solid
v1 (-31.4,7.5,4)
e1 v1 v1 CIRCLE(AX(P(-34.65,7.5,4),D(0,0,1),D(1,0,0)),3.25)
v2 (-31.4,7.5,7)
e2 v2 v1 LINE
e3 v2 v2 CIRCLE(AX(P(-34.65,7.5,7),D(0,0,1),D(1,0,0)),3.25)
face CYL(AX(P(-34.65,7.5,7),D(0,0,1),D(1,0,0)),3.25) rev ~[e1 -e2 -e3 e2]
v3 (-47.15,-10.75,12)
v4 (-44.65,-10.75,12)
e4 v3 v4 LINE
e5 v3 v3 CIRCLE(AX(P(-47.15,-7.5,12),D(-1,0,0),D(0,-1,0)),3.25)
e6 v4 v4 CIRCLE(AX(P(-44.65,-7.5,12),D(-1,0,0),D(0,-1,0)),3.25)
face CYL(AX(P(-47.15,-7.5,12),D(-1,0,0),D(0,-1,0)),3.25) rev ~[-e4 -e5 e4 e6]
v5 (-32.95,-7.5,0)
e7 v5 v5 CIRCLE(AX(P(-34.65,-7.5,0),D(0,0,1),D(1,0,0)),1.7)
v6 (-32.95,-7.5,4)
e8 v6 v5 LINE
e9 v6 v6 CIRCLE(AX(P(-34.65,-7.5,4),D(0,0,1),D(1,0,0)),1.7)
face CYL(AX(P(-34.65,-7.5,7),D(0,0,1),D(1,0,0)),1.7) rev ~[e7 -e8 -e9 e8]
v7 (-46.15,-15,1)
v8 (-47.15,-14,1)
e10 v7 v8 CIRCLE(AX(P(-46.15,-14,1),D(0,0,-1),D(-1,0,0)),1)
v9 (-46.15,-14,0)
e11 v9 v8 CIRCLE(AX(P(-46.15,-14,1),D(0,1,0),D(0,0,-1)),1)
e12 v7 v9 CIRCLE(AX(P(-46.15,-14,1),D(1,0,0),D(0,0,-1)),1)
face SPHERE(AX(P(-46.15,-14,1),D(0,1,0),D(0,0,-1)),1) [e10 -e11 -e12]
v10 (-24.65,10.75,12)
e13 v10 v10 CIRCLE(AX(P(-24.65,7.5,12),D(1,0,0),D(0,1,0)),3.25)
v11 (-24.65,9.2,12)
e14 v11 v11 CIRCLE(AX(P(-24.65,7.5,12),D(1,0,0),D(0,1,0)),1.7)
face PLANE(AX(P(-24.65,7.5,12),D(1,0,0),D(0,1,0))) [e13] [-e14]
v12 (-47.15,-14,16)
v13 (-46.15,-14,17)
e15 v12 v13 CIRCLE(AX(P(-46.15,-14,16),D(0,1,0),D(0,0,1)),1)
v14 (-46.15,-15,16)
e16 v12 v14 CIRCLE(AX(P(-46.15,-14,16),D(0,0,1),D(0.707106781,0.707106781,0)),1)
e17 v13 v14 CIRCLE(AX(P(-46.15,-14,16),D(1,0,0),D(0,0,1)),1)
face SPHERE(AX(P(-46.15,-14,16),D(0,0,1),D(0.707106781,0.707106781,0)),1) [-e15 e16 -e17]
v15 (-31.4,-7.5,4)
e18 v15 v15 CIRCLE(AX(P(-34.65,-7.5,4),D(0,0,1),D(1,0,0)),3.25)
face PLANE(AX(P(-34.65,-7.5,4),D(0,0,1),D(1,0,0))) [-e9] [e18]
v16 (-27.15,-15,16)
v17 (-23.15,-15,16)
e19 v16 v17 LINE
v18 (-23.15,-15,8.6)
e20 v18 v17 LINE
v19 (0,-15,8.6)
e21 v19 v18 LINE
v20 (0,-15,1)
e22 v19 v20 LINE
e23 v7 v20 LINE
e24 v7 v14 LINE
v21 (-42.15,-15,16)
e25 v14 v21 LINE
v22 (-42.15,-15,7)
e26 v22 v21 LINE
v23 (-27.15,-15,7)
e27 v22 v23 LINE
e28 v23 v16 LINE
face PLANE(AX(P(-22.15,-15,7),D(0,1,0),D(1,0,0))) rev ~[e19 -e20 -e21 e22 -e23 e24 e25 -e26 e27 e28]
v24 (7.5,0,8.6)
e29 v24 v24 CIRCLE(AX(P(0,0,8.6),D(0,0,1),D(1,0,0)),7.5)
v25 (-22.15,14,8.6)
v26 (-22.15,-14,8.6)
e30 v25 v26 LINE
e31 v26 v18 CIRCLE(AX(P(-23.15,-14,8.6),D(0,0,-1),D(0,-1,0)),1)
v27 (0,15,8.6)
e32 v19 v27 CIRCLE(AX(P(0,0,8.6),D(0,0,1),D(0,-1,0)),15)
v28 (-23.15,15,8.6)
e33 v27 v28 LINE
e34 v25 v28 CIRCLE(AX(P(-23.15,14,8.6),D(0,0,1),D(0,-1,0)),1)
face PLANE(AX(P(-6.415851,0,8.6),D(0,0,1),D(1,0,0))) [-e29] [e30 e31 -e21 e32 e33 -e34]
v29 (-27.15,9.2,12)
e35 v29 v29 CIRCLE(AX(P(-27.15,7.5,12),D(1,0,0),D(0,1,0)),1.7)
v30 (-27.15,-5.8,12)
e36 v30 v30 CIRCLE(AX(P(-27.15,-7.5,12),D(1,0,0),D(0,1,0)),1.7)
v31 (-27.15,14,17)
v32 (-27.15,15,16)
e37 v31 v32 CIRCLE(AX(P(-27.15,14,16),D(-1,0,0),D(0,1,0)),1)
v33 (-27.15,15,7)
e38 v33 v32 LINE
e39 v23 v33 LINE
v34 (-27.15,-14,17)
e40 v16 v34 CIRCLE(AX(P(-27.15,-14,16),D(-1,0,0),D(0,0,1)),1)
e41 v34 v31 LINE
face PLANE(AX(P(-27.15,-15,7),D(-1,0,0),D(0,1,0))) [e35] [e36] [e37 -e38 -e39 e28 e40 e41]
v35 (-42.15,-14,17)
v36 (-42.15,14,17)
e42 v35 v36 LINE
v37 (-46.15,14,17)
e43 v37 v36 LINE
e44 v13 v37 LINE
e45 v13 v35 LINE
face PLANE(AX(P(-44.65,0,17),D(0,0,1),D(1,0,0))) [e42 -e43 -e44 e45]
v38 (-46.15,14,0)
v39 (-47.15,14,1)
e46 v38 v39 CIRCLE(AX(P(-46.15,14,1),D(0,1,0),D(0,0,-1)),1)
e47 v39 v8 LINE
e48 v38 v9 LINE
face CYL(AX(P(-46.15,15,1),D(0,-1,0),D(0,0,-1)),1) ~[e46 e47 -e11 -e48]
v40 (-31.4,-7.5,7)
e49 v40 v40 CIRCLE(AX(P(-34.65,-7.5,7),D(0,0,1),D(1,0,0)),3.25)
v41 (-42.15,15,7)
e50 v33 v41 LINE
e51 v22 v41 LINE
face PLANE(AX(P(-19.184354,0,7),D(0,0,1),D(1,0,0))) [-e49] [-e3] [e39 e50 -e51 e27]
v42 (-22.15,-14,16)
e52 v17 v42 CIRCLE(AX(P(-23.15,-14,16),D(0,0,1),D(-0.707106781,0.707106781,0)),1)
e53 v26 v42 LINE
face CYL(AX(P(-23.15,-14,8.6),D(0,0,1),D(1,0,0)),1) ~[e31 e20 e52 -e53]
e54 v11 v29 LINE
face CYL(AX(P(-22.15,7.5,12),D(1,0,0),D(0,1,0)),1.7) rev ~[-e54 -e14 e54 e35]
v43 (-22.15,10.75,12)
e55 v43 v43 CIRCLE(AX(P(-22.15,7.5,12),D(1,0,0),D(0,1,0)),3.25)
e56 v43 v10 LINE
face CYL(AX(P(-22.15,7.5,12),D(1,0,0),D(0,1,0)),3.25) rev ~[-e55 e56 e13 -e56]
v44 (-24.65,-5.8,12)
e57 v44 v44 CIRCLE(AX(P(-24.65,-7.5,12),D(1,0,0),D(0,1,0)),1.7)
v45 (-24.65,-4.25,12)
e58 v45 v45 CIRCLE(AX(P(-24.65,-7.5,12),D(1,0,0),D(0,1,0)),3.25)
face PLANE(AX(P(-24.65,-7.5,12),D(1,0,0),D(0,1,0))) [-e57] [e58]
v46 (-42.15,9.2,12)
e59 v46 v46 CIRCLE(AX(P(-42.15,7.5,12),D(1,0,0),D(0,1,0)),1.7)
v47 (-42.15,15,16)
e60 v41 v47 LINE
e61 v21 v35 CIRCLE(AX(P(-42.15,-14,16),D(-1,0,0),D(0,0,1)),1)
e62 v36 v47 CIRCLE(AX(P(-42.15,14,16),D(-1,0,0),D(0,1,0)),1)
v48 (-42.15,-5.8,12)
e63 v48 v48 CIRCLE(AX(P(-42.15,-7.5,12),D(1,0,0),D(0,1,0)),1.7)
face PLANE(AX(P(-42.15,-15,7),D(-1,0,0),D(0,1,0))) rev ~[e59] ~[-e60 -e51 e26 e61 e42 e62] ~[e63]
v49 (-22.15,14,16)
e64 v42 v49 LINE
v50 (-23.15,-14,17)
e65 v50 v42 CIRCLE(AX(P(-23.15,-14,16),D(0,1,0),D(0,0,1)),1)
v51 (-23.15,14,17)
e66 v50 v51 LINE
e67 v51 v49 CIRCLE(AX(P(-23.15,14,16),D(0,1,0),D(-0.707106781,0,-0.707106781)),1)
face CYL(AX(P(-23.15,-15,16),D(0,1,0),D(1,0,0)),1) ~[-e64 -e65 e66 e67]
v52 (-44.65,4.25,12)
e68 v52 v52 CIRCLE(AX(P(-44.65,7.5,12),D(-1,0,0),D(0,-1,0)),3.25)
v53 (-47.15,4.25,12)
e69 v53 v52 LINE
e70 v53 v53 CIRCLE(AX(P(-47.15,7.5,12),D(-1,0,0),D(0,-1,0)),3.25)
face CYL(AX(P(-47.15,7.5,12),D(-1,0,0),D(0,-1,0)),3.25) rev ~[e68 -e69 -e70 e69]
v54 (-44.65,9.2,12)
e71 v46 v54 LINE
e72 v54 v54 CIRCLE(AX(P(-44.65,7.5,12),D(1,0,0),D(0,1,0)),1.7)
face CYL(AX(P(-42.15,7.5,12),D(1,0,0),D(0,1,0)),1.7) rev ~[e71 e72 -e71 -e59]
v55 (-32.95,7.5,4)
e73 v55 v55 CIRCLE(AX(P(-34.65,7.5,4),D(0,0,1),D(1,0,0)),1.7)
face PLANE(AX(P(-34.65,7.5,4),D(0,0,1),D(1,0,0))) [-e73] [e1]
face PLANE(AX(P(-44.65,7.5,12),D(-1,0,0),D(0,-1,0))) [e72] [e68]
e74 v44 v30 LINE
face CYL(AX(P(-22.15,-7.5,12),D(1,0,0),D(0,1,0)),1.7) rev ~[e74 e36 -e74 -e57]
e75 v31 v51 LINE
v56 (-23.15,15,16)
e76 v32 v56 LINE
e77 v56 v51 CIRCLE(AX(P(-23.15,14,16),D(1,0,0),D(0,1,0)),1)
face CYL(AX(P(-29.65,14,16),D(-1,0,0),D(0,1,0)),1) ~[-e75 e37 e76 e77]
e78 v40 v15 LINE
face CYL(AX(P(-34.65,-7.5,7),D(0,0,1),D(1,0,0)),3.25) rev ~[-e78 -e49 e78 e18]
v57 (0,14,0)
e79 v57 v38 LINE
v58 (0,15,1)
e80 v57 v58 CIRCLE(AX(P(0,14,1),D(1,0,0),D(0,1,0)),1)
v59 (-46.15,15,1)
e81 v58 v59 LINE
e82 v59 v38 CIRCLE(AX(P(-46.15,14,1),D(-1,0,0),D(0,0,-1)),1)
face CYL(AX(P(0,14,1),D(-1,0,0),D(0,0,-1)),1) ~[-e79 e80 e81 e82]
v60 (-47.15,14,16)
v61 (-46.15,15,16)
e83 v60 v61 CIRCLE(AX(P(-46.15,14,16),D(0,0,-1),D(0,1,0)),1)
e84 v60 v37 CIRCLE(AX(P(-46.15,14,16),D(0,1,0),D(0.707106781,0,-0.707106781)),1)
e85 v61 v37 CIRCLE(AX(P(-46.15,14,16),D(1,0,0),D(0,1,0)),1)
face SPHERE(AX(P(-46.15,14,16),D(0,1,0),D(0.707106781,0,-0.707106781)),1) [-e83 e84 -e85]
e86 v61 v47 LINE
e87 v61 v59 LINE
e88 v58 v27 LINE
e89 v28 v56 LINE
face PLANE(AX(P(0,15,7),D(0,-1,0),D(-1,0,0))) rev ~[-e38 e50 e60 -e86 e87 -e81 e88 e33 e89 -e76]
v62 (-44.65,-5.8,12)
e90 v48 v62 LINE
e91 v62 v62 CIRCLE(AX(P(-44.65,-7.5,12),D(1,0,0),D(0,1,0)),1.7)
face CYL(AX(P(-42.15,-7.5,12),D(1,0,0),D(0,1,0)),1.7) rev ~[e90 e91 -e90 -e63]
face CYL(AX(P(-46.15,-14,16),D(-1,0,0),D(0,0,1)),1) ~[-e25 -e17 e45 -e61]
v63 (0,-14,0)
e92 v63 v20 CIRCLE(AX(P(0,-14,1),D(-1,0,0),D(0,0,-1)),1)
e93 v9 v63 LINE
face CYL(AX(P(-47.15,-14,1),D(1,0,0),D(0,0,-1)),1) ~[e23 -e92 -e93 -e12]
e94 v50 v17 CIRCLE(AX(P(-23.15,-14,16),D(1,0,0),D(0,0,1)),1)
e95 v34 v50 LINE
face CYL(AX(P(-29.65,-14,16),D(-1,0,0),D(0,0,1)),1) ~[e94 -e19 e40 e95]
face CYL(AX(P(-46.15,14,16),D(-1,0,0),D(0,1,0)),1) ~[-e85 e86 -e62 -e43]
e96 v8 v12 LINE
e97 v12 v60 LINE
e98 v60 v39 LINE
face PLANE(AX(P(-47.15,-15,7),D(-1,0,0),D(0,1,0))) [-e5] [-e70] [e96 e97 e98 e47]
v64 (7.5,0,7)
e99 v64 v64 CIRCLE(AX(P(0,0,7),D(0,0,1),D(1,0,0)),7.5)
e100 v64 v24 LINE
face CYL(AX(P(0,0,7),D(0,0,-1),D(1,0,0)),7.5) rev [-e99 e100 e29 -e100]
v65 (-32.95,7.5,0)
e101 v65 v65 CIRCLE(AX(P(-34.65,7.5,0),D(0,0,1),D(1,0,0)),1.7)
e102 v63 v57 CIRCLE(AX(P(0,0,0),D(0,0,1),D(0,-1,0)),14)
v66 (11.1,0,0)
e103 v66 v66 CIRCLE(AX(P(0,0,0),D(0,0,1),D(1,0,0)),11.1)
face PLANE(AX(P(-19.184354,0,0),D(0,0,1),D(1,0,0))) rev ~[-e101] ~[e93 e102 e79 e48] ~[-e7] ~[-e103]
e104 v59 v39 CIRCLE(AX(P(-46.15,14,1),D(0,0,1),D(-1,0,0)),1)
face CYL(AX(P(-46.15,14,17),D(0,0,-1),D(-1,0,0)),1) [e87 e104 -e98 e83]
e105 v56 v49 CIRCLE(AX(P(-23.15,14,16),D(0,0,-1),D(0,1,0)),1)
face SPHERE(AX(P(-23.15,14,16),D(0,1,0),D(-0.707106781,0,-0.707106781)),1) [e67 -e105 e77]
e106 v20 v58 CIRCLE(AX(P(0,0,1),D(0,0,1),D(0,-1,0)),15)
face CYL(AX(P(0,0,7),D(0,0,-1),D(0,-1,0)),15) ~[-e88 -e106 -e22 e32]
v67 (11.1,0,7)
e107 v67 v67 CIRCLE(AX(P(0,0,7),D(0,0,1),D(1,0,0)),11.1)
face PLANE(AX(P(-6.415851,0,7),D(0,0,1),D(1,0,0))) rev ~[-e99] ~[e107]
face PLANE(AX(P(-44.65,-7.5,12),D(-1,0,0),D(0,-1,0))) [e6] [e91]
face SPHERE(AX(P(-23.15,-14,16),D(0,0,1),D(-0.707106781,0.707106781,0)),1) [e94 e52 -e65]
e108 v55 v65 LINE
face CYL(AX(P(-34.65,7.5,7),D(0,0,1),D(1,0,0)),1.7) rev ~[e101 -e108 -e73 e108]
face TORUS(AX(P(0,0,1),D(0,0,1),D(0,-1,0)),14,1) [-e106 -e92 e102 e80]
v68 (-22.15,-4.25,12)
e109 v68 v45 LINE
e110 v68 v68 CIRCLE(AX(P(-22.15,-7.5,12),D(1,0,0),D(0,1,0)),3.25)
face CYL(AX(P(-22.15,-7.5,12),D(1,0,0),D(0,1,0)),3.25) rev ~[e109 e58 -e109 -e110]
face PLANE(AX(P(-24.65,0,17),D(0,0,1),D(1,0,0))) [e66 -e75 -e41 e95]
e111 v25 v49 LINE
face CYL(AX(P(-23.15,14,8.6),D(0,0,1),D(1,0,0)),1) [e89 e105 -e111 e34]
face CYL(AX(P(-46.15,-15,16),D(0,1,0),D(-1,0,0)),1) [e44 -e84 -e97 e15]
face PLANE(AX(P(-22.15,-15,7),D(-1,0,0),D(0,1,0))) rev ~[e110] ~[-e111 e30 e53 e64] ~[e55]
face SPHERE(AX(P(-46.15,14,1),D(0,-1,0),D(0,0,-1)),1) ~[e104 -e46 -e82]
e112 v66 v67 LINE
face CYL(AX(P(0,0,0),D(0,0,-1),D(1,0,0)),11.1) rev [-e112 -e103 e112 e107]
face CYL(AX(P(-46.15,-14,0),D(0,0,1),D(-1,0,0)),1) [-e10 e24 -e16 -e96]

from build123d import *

# Parameters (mm, degrees)
F0_R          = 11.1
F1_DEPTH      = 7
F2_W          = 5
F2_H          = 30
F3_DEPTH      = 10
F4_R          = 1.7
F5_DEPTH      = 5.001
F6_R          = 3.25
F7_DEPTH      = 2.5
F8_R          = 1.7
F9_DEPTH      = 25.001
F10_R         = 3.25
F11_DEPTH     = 2.5
F12_R         = 7.5
F13_DEPTH     = 1.6
F14_R         = 1
F15_R         = 1.7
F16_DEPTH     = 7.001
F17_R         = 3.25
F18_DEPTH     = 3
F19_T1_DEPTH  = 6.5
F19_T3_DEPTH  = 6.5
F19_S7_W      = 1
F19_S7_H      = 1
F19_T8_DEPTH  = 1
F19_S13_W     = 1
F19_S13_H     = 1
F19_T14_DEPTH = 1
F19_S19_W     = 1
F19_S19_H     = 1
F19_T20_DEPTH = 1
F19_S25_W     = 1
F19_S25_H     = 1
F19_T26_DEPTH = 1


# Not quite as in the source:
# - a fillet or chamfer that OpenCascade refuses, or shapes differently, is made with other operations: its cross-section is extruded or revolved along the edge and cut away or added


with BuildPart() as f1:
    # F0 (on Top) → F1 (new body)
    with BuildSketch(Plane.XY):
        with BuildLine():
            Line((-47.15, -15), (0, -15))
            ThreePointArc((0, -15), (15, 0), (0, 15))
            Line((0, 15), (-47.15, 15))
            Line((-47.15, 15), (-47.15, -15))
        make_face()
        Circle(F0_R, mode=Mode.SUBTRACT)
    extrude(amount=F1_DEPTH)

    # F2 (on face) → F3 (join)
    with BuildSketch(Plane.XY.offset(7)):
        with Locations((-44.65, 0)):
            Rectangle(F2_W, F2_H)
        with Locations((-24.65, 0)):
            Rectangle(F2_W, F2_H)
    extrude(amount=F3_DEPTH)

    # F4 (on face) → F5 (cut, through all)
    with BuildSketch(Plane.YZ.offset(-42.15)):
        with Locations((7.5, 12)):
            Circle(F4_R)
        with Locations((-7.5, 12)):
            Circle(F4_R)
    extrude(amount=-F5_DEPTH, mode=Mode.SUBTRACT)

    # F6 (on face) → F7 (cut)
    with BuildSketch(Plane(origin=(-47.15, 0, 0), x_dir=(0, -1, 0), z_dir=(-1, 0, 0))):
        with Locations((-7.5, 12)):
            Circle(F6_R)
        with Locations((7.5, 12)):
            Circle(F6_R)
    extrude(amount=-F7_DEPTH, mode=Mode.SUBTRACT)

    # F8 (on face) → F9 (cut, through all)
    with BuildSketch(Plane.YZ.offset(-22.15)):
        with Locations((7.5, 12)):
            Circle(F8_R)
        with Locations((-7.5, 12)):
            Circle(F8_R)
    extrude(amount=-F9_DEPTH, mode=Mode.SUBTRACT)

    # F10 (on face) → F11 (cut)
    with BuildSketch(Plane.YZ.offset(-22.15)):
        with Locations((7.5, 12)):
            Circle(F10_R)
        with Locations((-7.5, 12)):
            Circle(F10_R)
    extrude(amount=-F11_DEPTH, mode=Mode.SUBTRACT)

    # F12 (on face) → F13 (join)
    with BuildSketch(Plane.XY.offset(7)):
        with BuildLine():
            ThreePointArc((0, -15), (15, 0), (0, 15))
            Line((0, 15), (-22.15, 15))
            Line((-22.15, 15), (-22.15, -15))
            Line((-22.15, -15), (0, -15))
        make_face()
        Circle(F12_R, mode=Mode.SUBTRACT)
    extrude(amount=F13_DEPTH)

    # F14
    f14_edges = [f1.edges().sort_by_distance(p)[0] for p in [
        (-47.15, 0, 0),
        (-23.575, -15, 0),
        (15, 0, 0),
        (-23.575, 15, 0),
        (-47.15, -15, 8.5),
        (-47.15, 15, 8.5),
        (-47.15, 0, 17),
        (-22.15, 0, 17),
        (-22.15, -15, 12.8),
        (-22.15, 15, 12.8),
    ]]
    fillet(f14_edges, radius=F14_R)

    # F15 (on face) → F16 (cut, through all)
    with BuildSketch(Plane.XY.offset(7)):
        with Locations((-34.65, -7.5)):
            Circle(F15_R)
        with Locations((-34.65, 7.5)):
            Circle(F15_R)
    extrude(amount=-F16_DEPTH, mode=Mode.SUBTRACT)

    # F17 (on face) → F18 (cut)
    with BuildSketch(Plane.XY.offset(7)):
        with Locations((-34.65, -7.5)):
            Circle(F17_R)
        with Locations((-34.65, 7.5)):
            Circle(F17_R)
    extrude(amount=-F18_DEPTH, mode=Mode.SUBTRACT)

    # F19: fillet of radius 1 on 4 edges, made by hand

    # F19_s2 → F19_t1 (cut)
    with BuildSketch(Plane.YZ.offset(-46.15)):
        with BuildLine():
            ThreePointArc((15, 16), (14.7071067812, 16.7071067812), (14, 17))
            Line((14, 17), (15, 17))
            Line((15, 17), (15, 16))
        make_face()
        with BuildLine():
            ThreePointArc((-14, 17), (-14.7071067812, 16.7071067812), (-15, 16))
            Line((-15, 16), (-15, 17))
            Line((-15, 17), (-14, 17))
        make_face()
    extrude(amount=F19_T1_DEPTH, mode=Mode.SUBTRACT)

    # F19_s4 → F19_t3 (cut)
    with BuildSketch(Plane.YZ.offset(-29.65)):
        with BuildLine():
            ThreePointArc((15, 16), (14.7071067812, 16.7071067812), (14, 17))
            Line((14, 17), (15, 17))
            Line((15, 17), (15, 16))
        make_face()
        with BuildLine():
            ThreePointArc((-14, 17), (-14.7071067812, 16.7071067812), (-15, 16))
            Line((-15, 16), (-15, 17))
            Line((-15, 17), (-14, 17))
        make_face()
    extrude(amount=F19_T3_DEPTH, mode=Mode.SUBTRACT)


with BuildPart() as f19_tool6:
    # F19_s7 → F19_t8 (new body)
    with BuildSketch(Plane.XY.offset(16)):
        with Locations((-46.65, -14.5)):
            Rectangle(F19_S7_W, F19_S7_H)
    extrude(amount=F19_T8_DEPTH)

    # F19_s9 → F19_t10 (revolve, cut)
    with BuildSketch(Plane(origin=(-46.15, -14, 16), x_dir=(0.7071067812, 0.7071067812, 0), z_dir=(0.7071067812, -0.7071067812, 0))):
        with BuildLine():
            ThreePointArc((0, -1), (1, 0), (0, 1))
            Line((0, 1), (0, -1))
        make_face()
    revolve(axis=Axis((-46.15, -14, 16), (0, 0, 1)), mode=Mode.SUBTRACT)


with BuildPart() as f1_1:
    add(f1.part)

    # F19_t5: cut F19_tool6
    add(f19_tool6.part, mode=Mode.SUBTRACT)


with BuildPart() as f19_tool12:
    # F19_s13 → F19_t14 (new body)
    with BuildSketch(Plane.XY.offset(16)):
        with Locations((-22.65, -14.5)):
            Rectangle(F19_S13_W, F19_S13_H)
    extrude(amount=F19_T14_DEPTH)

    # F19_s15 → F19_t16 (revolve, cut)
    with BuildSketch(Plane(origin=(-23.15, -14, 16), x_dir=(-0.7071067812, 0.7071067812, 0), z_dir=(0.7071067812, 0.7071067812, 0))):
        with BuildLine():
            ThreePointArc((0, -1), (1, 0), (0, 1))
            Line((0, 1), (0, -1))
        make_face()
    revolve(axis=Axis((-23.15, -14, 16), (0, 0, 1)), mode=Mode.SUBTRACT)


with BuildPart() as f1_2:
    add(f1_1.part)

    # F19_t11: cut F19_tool12
    add(f19_tool12.part, mode=Mode.SUBTRACT)


with BuildPart() as f19_tool18:
    # F19_s19 → F19_t20 (new body)
    with BuildSketch(Plane.XZ.offset(-14)):
        with Locations((-22.65, 16.5)):
            Rectangle(F19_S19_W, F19_S19_H)
    extrude(amount=-F19_T20_DEPTH)

    # F19_s21 → F19_t22 (revolve, cut)
    with BuildSketch(Plane(origin=(-23.15, 14, 16), x_dir=(-0.7071067812, 0, -0.7071067812), z_dir=(0.7071067812, 0, -0.7071067812))):
        with BuildLine():
            ThreePointArc((0, -1), (1, 0), (0, 1))
            Line((0, 1), (0, -1))
        make_face()
    revolve(axis=Axis((-23.15, 14, 16), (0, 1, 0)), mode=Mode.SUBTRACT)


with BuildPart() as f1_3:
    add(f1_2.part)

    # F19_t17: cut F19_tool18
    add(f19_tool18.part, mode=Mode.SUBTRACT)


with BuildPart() as f19_tool24:
    # F19_s25 → F19_t26 (new body)
    with BuildSketch(Plane.XZ.offset(-14)):
        with Locations((-46.65, 16.5)):
            Rectangle(F19_S25_W, F19_S25_H)
    extrude(amount=-F19_T26_DEPTH)

    # F19_s27 → F19_t28 (revolve, cut)
    with BuildSketch(Plane(origin=(-46.15, 14, 16), x_dir=(0.7071067812, 0, -0.7071067812), z_dir=(0.7071067812, 0, 0.7071067812))):
        with BuildLine():
            ThreePointArc((0, -1), (1, 0), (0, 1))
            Line((0, 1), (0, -1))
        make_face()
    revolve(axis=Axis((-46.15, 14, 16), (0, 1, 0)), mode=Mode.SUBTRACT)


with BuildPart() as f1_4:
    add(f1_3.part)

    # F19_t23: cut F19_tool24
    add(f19_tool24.part, mode=Mode.SUBTRACT)


solid = f1_4.part
